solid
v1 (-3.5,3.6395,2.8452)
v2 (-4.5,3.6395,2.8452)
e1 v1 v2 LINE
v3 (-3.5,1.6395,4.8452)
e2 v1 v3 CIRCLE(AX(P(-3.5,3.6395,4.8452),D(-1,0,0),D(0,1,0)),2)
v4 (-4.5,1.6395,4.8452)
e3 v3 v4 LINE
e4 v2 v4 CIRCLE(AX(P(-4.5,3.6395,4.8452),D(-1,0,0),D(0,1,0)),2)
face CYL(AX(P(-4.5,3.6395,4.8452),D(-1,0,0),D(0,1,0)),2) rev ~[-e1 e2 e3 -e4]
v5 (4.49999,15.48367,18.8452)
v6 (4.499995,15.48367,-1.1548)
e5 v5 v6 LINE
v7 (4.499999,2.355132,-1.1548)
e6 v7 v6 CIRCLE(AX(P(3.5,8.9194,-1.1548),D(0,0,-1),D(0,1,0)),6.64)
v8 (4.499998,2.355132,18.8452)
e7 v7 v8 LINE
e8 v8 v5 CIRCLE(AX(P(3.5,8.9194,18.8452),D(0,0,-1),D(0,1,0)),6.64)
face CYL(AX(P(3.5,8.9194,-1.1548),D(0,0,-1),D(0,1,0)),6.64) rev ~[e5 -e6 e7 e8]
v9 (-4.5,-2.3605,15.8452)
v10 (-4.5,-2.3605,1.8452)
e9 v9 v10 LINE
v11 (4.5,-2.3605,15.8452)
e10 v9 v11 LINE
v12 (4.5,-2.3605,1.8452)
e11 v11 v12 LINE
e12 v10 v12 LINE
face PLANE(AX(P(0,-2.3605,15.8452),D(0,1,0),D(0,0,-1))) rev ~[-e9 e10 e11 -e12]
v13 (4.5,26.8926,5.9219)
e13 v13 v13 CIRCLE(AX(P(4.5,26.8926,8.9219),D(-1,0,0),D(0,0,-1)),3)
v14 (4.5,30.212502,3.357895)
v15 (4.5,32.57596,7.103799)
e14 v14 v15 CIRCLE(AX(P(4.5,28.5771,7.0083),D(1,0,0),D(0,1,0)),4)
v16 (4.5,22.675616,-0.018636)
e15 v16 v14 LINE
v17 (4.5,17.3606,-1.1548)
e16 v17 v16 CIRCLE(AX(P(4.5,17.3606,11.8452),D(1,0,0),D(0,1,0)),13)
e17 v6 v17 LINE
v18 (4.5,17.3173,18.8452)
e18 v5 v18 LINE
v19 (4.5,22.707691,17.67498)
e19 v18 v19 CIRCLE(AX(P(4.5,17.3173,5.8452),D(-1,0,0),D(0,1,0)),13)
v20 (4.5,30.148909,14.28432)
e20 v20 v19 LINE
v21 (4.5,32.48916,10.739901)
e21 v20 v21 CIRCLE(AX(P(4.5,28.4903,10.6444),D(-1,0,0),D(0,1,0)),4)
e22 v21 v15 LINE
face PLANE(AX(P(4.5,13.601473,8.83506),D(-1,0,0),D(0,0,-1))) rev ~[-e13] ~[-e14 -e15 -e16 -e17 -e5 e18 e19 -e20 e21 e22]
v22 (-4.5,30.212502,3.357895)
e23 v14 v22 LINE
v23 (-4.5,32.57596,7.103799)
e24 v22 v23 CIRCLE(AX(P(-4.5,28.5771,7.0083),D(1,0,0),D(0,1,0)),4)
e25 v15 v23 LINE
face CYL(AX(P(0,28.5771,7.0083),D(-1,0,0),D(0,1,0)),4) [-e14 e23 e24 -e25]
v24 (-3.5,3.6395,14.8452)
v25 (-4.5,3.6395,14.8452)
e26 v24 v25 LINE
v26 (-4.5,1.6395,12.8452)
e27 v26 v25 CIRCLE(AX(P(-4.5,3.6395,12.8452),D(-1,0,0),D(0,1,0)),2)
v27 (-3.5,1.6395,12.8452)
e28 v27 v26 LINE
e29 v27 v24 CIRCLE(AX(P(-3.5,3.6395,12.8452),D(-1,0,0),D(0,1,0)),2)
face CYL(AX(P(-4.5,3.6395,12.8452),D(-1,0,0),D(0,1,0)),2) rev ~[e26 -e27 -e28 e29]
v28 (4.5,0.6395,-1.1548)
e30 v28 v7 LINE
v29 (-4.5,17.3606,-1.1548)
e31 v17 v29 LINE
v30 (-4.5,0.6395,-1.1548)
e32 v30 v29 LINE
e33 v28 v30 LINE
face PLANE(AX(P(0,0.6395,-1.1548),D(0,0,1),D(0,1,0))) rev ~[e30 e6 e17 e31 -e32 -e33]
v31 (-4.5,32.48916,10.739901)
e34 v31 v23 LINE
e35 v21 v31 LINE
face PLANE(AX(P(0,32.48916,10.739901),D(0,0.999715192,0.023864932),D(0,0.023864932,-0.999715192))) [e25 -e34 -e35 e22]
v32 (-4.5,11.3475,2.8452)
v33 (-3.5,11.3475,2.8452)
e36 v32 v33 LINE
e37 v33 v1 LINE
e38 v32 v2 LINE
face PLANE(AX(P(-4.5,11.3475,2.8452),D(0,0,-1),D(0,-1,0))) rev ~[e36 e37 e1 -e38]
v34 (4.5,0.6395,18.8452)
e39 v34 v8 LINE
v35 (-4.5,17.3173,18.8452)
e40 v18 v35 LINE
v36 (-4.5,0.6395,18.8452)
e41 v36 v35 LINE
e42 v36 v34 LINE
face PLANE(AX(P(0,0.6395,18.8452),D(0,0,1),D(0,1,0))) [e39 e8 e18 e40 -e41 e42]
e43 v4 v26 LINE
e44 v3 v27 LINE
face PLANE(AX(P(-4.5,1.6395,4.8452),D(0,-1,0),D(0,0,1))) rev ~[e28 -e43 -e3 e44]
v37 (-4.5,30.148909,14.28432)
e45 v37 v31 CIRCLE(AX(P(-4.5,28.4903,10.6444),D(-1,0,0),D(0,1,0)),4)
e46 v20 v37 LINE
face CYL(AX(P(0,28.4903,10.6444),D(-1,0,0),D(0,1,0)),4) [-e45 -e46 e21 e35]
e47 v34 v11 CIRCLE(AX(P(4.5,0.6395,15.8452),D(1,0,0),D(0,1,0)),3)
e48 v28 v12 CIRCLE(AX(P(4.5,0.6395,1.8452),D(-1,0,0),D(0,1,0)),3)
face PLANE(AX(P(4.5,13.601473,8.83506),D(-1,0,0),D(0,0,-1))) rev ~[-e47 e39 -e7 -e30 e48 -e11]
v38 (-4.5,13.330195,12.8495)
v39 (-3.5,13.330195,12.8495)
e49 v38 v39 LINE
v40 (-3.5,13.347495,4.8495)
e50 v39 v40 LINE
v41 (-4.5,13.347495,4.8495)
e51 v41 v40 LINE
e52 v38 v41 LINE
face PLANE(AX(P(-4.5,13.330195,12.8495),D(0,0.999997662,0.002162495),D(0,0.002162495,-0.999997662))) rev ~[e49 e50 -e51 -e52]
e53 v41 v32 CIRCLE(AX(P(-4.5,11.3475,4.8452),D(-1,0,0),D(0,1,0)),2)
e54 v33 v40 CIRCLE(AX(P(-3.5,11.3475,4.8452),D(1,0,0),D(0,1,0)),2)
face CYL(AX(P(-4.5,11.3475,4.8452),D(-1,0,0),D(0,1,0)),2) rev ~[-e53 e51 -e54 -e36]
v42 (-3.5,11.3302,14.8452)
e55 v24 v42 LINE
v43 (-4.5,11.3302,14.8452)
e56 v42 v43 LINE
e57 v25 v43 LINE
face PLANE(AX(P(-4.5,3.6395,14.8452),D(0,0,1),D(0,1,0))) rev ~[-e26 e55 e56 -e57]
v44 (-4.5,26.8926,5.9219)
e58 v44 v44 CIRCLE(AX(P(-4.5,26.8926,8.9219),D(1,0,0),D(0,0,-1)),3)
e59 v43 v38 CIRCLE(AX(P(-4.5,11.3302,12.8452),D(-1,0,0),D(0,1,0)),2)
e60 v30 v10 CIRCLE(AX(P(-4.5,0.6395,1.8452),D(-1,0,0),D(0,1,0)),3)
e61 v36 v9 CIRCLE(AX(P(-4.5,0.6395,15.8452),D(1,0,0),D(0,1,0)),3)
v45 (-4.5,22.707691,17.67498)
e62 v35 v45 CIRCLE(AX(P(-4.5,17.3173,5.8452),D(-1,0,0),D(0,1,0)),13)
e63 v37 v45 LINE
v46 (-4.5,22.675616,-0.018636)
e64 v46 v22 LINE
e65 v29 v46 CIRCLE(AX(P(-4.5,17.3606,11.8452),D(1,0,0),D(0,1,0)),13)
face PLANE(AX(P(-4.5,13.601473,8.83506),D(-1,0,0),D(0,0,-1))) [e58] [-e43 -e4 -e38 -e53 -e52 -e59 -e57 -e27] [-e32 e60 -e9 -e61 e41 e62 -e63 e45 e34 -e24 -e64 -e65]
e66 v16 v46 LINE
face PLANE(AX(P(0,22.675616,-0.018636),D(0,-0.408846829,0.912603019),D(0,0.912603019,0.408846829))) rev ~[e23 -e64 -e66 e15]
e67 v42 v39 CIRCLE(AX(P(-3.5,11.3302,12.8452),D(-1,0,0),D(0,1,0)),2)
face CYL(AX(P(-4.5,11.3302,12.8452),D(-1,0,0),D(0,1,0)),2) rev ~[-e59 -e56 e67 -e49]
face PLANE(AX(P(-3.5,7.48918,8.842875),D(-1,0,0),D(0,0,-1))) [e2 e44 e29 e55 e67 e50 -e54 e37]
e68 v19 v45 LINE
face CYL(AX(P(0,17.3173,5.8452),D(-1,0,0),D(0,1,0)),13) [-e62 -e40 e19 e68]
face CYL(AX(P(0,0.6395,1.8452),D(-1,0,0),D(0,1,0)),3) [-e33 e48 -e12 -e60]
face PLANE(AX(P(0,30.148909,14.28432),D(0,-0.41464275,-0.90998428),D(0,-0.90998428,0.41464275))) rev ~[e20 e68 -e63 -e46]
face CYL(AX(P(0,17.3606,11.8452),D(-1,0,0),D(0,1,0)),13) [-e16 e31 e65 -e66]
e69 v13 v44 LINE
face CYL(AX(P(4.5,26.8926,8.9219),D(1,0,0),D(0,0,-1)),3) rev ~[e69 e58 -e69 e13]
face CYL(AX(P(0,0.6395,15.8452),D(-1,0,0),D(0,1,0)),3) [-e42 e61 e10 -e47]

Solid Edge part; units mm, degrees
sketch "Sketch1" plane through (0, 54.6395, 8.8452) normal (1, 0, 0) x (0, 1, 0)
  line L0 (-54, 10) -> (-37.3222, 10)
  arc A0 (-37.3222, 10) -> (-31.9318, 8.8298) centre (-37.3222, -3) cw
  line L1 (-24.4906, 5.4391) -> (-31.9318, 8.8298)
  arc A1 (-24.4906, 5.4391) -> (-22.1504, 1.8947) centre (-26.1492, 1.7992) cw
  line L2 (-22.1504, 1.8947) -> (-22.0635, -1.7414)
  arc A2 (-24.427, -5.4873) -> (-22.0635, -1.7414) centre (-26.0624, -1.8369) ccw
  line L3 (-31.9639, -8.8638) -> (-24.427, -5.4873)
  arc A3 (-37.2789, -10) -> (-31.9639, -8.8638) centre (-37.2789, 3) ccw
  line L4 (-54, -10) -> (-37.2789, -10)
  arc A4 (-54, -10) -> (-57, -7) centre (-54, -7) cw
  line L5 (-57, 7) -> (-57, -7)
  arc A5 (-54, 10) -> (-57, 7) centre (-54, 7) ccw
extrude "Protrusion1" add sketch "Sketch1" along normal mid plane 9
sketch "Sketch2" plane through (-45.6395, -10, -1.1548) normal (0, 0, -1) x (0, 1, 0)
  arc A0 (25.4838, 50.1395) -> (12.3551, 50.1395) centre (18.9194, 49.1395) cw
  line L0 (12.3551, 50.1395) -> (25.4838, 50.1395)
extrude "Cutout1" cut sketch "Sketch2" against normal up to next and the other way through all
hole "Hole_1" at (4.5, 26.8926, 8.9219) direction (-1, 0, 0) diameter 6 end up to next
sketch "Sketch3" plane through (-4.5, 15.1083, 8.8452) normal (-1, 0, 0) x (0, 1, 0)
  line L0 (-3.7608, 6) -> (-11.4688, 6)
  arc A0 (-11.4688, 6) -> (-13.4688, 4) centre (-11.4688, 4) ccw
  line L1 (-13.4688, 4) -> (-13.4688, -4)
  arc A1 (-13.4688, -4) -> (-11.4688, -6) centre (-11.4688, -4) ccw
  line L2 (-11.4688, -6) -> (-3.7781, -6)
  arc A2 (-3.7781, -6) -> (-1.7781, -4.0043) centre (-3.7781, -4) ccw
  line L3 (-1.7781, -4.0043) -> (-1.7608, 3.9957)
  arc A3 (-3.7608, 6) -> (-1.7608, 3.9957) centre (-3.7608, 4) cw
extrude "ExtrudedCutout_3" cut sketch "Sketch3" against normal blind 1 and the other way blind 11.7703
